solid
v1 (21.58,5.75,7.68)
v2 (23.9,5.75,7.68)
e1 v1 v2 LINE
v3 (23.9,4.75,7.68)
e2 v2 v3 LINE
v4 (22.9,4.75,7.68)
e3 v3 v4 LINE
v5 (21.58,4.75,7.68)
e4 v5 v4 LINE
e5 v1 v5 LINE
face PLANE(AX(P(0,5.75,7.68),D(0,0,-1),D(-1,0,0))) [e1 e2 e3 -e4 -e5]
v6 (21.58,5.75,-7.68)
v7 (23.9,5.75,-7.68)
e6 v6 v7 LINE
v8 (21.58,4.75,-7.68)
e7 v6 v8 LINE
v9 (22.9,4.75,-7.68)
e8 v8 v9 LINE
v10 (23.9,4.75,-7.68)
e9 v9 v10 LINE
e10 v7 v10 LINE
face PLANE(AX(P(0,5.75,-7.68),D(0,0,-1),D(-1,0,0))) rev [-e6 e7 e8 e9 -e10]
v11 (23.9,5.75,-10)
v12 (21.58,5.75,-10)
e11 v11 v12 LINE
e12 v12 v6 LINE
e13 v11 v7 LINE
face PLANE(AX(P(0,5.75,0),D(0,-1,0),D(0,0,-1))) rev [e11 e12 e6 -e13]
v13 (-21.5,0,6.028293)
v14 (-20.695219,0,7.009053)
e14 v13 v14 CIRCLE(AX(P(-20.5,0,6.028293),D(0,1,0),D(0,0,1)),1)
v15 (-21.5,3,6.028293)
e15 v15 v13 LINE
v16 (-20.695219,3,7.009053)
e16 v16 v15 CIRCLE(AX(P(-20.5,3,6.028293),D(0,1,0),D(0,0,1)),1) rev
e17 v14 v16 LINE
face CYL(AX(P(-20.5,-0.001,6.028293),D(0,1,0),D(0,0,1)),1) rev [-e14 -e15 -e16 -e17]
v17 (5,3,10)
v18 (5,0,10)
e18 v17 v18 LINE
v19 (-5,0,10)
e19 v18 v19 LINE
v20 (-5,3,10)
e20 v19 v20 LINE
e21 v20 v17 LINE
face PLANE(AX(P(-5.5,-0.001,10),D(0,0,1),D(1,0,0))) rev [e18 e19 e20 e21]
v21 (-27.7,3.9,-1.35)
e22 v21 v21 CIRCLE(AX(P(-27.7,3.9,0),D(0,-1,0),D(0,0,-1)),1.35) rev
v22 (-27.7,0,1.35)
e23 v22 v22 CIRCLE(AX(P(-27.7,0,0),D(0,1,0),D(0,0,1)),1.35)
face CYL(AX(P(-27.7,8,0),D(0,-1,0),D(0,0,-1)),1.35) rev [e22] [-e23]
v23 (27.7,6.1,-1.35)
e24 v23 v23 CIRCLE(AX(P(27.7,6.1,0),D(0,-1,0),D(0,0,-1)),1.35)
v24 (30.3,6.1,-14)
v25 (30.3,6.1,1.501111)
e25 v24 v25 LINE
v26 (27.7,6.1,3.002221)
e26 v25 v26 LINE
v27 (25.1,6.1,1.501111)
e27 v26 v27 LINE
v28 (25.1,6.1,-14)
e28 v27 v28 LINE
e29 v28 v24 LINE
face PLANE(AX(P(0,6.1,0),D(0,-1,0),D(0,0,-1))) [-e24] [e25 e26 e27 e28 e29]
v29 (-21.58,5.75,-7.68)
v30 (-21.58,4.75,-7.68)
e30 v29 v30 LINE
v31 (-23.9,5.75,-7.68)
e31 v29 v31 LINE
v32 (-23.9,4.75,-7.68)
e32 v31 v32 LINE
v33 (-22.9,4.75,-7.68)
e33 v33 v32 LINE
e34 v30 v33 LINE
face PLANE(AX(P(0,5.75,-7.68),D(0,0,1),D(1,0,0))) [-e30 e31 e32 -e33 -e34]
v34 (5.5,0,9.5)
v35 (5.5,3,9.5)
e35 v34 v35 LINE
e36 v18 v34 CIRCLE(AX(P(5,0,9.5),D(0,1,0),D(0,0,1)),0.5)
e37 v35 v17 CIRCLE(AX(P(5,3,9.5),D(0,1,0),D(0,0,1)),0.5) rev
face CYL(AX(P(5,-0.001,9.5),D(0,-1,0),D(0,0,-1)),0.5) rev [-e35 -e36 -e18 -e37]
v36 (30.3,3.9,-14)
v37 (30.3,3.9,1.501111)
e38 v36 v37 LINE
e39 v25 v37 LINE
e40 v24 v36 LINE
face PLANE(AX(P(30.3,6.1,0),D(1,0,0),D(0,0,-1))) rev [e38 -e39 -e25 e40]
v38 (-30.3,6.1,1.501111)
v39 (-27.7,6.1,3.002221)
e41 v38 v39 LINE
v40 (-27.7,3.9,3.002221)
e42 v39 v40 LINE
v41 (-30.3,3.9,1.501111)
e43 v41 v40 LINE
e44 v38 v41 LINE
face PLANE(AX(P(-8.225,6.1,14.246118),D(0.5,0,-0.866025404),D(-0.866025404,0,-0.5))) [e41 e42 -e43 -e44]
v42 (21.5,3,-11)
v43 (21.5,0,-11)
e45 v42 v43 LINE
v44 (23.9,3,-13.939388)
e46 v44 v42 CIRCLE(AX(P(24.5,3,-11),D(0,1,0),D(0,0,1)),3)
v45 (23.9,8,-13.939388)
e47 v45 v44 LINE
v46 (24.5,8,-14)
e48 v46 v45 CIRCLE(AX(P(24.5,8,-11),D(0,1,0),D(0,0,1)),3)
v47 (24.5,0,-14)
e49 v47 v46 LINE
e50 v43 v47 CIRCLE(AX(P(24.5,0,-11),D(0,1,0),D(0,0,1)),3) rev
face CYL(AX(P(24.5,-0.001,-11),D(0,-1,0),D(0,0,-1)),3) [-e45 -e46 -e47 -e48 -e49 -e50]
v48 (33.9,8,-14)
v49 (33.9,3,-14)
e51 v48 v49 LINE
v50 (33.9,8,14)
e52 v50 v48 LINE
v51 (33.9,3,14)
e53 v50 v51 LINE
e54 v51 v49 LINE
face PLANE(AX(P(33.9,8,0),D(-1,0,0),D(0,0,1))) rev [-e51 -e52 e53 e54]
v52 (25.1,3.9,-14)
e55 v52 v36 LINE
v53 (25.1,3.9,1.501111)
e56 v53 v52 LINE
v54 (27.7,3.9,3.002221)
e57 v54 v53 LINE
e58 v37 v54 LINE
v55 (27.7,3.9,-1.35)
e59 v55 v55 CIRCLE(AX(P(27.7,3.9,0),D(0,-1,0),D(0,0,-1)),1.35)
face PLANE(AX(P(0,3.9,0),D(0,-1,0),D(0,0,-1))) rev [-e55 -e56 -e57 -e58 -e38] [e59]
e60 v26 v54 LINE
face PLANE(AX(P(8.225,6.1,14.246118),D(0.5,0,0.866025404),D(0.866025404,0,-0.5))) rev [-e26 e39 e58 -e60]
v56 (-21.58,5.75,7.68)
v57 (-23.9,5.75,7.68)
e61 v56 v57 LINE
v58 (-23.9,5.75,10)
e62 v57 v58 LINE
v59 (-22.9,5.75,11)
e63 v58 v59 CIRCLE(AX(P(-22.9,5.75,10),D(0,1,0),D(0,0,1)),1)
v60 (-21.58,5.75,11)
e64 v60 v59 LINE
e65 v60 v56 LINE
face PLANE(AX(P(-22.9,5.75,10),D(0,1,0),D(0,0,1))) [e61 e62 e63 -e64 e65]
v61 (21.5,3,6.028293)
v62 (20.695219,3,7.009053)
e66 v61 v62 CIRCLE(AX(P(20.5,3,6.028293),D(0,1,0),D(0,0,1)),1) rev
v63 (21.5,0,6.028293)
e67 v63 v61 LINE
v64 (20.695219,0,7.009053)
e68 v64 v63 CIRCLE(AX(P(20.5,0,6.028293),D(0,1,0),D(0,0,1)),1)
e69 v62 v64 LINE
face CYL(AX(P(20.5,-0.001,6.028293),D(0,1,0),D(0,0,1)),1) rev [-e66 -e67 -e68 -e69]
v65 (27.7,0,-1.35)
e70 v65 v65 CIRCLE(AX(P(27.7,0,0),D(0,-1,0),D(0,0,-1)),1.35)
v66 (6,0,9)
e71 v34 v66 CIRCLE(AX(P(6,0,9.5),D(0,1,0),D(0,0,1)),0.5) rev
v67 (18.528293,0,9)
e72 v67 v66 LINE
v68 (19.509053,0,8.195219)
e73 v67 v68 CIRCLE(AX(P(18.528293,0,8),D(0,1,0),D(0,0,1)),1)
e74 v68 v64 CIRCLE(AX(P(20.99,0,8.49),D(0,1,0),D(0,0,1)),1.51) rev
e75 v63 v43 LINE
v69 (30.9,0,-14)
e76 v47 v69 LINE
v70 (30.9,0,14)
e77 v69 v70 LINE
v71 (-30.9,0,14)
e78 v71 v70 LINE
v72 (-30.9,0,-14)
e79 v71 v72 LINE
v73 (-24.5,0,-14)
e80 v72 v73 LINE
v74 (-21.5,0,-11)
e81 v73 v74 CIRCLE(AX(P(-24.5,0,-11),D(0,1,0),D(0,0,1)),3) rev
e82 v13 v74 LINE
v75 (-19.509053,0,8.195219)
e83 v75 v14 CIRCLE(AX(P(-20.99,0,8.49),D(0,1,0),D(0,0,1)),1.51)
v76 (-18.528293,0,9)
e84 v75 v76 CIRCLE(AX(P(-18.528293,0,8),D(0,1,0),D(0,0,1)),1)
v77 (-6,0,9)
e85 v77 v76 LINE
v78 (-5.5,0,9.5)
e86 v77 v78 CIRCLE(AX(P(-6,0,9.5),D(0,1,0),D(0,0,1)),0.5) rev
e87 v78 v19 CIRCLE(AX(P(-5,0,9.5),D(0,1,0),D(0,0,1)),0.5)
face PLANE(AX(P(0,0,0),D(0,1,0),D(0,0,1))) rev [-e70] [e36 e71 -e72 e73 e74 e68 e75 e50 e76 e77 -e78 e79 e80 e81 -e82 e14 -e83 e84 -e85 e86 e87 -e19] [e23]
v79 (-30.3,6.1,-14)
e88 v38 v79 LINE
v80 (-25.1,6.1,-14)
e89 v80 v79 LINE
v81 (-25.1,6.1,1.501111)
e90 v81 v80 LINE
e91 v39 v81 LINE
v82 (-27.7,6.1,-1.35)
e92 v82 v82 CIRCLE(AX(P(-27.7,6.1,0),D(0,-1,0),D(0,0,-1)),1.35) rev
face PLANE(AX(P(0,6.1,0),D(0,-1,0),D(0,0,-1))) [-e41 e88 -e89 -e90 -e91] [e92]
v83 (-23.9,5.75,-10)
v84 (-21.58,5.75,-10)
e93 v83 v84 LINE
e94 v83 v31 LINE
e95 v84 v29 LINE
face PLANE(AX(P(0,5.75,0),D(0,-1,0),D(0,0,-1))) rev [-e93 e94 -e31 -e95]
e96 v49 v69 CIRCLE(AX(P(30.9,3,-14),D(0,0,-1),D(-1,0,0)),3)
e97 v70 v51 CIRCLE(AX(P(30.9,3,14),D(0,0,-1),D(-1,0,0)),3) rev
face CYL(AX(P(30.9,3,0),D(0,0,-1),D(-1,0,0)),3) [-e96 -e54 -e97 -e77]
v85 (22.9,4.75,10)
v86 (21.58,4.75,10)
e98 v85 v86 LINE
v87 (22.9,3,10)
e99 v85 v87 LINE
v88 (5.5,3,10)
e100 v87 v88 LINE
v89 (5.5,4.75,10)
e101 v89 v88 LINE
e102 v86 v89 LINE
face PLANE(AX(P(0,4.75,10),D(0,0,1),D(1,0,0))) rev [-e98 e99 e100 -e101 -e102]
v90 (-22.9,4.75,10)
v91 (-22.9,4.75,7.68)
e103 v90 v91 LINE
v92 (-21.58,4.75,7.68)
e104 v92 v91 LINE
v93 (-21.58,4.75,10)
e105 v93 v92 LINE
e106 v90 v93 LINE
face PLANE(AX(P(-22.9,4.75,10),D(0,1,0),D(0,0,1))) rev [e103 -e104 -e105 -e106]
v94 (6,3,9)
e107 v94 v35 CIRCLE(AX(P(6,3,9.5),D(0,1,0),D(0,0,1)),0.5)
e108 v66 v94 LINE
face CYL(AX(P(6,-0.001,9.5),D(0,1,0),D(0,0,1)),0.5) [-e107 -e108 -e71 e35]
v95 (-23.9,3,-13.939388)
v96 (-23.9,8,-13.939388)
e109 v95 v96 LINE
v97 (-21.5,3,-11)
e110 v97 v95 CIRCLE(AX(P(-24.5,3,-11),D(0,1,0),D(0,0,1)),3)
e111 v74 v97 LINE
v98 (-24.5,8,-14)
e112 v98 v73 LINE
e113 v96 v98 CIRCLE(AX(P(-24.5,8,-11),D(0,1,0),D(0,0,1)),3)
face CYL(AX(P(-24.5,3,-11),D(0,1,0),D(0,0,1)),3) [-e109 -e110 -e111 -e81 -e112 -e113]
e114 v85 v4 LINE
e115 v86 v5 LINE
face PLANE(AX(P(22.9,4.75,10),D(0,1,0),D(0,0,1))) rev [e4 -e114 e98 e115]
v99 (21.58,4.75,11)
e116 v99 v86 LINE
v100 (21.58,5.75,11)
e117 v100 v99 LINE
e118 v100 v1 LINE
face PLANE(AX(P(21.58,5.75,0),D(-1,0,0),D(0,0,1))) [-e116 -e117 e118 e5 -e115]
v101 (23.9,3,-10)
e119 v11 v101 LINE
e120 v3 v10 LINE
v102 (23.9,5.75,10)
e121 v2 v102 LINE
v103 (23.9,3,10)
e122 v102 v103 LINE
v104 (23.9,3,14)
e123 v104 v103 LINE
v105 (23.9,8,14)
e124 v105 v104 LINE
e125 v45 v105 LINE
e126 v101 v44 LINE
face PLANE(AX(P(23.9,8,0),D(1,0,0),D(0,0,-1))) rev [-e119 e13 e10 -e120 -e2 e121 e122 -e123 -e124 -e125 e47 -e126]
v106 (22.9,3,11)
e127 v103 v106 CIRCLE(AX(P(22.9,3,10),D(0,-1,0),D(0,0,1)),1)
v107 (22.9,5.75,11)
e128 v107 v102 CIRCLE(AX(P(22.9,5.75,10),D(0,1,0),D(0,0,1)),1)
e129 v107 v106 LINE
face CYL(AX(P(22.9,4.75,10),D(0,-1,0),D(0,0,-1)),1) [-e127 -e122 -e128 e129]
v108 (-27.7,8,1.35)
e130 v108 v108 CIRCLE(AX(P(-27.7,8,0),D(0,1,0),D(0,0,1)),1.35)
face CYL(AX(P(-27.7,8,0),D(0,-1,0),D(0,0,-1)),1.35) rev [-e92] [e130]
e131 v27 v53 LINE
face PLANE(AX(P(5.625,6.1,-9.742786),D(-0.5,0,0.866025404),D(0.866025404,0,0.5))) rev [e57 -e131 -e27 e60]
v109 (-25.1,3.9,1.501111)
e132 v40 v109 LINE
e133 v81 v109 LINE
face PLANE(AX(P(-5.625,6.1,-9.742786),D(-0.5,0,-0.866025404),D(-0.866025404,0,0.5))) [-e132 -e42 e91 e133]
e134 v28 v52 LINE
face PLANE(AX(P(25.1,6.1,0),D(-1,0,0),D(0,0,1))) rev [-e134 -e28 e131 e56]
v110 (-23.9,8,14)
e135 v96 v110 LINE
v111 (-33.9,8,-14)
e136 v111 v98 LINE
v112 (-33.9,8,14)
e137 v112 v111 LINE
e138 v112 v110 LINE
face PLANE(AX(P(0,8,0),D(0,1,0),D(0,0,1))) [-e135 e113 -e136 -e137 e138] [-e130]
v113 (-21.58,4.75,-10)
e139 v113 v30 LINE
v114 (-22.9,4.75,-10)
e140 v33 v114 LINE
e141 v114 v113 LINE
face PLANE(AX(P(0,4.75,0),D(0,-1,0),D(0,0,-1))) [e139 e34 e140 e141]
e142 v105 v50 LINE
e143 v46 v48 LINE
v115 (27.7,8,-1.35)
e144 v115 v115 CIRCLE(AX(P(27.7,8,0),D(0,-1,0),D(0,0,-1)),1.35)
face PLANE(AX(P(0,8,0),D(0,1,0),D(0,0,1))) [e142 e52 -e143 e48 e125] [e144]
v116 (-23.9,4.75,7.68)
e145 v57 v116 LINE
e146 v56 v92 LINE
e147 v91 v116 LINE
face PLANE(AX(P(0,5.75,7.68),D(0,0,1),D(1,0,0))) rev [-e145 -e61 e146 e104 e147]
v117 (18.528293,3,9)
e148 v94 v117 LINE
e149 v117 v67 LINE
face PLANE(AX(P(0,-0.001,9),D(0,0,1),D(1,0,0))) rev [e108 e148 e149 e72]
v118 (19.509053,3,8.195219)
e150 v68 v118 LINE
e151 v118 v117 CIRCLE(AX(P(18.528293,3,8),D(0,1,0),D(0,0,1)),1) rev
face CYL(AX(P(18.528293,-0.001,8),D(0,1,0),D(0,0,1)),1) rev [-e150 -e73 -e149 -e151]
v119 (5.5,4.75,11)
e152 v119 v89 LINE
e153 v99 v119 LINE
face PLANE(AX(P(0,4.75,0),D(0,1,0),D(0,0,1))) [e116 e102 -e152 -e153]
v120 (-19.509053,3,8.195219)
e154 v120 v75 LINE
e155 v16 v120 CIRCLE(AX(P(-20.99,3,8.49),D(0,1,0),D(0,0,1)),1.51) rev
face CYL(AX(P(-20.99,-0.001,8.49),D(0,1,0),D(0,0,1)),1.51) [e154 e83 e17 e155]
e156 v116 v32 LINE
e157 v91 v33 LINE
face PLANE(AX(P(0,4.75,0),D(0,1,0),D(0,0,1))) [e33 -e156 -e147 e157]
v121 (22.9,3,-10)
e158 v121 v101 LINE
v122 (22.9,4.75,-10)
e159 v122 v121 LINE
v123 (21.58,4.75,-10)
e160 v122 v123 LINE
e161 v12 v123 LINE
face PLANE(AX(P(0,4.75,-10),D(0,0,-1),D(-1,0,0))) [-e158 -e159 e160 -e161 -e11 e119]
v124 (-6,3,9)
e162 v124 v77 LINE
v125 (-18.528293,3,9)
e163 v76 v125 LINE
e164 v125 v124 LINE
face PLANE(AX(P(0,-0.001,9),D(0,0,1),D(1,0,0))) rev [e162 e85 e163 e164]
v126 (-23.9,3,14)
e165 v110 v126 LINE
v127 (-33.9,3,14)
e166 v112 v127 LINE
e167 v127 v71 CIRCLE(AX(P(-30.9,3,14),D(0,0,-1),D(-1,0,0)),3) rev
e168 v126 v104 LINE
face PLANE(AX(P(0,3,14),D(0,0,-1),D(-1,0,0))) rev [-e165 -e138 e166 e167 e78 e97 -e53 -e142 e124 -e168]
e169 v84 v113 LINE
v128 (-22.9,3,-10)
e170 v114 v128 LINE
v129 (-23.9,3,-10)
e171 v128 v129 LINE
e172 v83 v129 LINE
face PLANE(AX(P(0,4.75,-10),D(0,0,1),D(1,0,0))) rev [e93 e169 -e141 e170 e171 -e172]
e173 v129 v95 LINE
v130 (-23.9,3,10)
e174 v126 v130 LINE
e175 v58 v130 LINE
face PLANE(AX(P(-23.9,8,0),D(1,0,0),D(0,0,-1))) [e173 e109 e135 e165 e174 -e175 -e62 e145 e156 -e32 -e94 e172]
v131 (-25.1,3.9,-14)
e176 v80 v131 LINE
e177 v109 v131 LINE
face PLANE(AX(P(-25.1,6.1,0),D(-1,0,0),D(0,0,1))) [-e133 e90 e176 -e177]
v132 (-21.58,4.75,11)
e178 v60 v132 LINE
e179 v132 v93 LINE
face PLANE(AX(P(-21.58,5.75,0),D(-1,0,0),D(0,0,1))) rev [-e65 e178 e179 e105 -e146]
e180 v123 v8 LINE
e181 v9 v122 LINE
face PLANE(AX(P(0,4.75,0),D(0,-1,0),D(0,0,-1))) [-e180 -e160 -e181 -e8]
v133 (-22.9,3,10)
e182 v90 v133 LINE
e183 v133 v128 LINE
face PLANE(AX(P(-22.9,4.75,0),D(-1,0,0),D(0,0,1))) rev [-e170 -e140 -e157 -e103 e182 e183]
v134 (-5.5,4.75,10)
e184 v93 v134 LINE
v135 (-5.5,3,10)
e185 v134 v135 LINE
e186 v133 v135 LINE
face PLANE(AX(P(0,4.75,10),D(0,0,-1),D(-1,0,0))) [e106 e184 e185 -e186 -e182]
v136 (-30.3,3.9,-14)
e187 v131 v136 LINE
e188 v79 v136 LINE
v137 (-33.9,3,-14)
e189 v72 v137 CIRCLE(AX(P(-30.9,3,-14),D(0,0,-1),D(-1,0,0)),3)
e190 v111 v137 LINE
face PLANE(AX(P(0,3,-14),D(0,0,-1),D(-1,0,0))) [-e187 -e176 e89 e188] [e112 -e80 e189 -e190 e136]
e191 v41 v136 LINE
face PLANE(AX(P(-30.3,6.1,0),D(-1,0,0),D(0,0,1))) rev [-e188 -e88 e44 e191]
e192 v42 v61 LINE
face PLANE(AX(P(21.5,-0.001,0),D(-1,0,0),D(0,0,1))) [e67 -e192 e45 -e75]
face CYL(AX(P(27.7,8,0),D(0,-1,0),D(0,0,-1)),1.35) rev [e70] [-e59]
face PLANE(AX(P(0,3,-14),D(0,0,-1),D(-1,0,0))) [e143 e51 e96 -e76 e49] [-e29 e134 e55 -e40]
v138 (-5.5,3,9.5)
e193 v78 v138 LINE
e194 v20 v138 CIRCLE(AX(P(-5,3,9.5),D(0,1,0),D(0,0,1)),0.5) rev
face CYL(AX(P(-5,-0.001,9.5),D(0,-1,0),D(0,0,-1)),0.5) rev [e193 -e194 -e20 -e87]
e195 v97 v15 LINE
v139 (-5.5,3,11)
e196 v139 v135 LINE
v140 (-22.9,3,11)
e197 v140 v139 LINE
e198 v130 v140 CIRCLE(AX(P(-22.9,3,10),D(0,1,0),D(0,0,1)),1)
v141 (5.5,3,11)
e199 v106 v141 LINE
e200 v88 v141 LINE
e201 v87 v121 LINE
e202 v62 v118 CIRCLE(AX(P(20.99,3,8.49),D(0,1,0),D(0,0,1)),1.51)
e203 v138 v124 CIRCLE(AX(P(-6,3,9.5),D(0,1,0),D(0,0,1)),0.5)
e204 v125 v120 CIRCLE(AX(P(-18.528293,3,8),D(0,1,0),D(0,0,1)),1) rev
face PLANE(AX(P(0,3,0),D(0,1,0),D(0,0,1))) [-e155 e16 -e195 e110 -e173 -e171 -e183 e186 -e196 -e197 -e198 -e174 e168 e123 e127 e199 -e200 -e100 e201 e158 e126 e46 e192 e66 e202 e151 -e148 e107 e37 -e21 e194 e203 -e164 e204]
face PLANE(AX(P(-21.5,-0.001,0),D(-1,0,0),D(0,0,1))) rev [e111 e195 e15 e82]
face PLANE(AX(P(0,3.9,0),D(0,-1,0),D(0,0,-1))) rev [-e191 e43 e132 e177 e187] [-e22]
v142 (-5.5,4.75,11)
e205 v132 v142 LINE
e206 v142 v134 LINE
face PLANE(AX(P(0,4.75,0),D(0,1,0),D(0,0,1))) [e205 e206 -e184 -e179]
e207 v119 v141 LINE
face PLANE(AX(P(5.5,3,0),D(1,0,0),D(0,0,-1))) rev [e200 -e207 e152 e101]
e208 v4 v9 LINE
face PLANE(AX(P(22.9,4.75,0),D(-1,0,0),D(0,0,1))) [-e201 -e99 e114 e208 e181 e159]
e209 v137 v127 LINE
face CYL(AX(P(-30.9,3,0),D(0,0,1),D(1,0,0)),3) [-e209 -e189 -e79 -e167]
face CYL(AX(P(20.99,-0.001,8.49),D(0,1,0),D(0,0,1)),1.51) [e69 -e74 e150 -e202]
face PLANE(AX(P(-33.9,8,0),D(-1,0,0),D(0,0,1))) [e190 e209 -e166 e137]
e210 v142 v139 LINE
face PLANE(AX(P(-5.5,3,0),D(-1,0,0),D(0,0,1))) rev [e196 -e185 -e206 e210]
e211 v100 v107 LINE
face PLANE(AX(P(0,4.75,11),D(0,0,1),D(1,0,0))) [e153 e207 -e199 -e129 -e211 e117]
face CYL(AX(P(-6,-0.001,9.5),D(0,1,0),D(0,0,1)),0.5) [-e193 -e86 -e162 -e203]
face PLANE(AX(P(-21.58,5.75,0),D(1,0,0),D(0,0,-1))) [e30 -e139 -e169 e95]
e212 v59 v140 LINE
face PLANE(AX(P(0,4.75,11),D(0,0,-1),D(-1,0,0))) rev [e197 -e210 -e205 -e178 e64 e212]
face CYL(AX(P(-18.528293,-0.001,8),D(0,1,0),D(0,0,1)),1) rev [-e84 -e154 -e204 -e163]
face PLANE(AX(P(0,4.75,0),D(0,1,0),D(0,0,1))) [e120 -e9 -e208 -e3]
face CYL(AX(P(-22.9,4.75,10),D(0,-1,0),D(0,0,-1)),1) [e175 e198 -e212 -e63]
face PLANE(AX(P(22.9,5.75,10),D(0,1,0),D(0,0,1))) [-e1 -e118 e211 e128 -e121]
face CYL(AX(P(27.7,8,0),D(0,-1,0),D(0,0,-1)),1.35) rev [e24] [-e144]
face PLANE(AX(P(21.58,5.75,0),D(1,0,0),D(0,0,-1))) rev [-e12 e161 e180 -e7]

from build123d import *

# Parameters (mm, degrees)
SKETCH1_R                = 8.05
SKETCH1_R_2              = 0.8
BOSS_EXTRUDE1_DEPTH      = 3
SKETCH1_5_R              = 0.8
BOSS_EXTRUDE3_DEPTH      = 3
CUT_EXTRUDE2_REACH       = 32.121
SKETCH5_R                = 8.05
FILLET2_R                = 1
BOSS_EXTRUDE4_DEPTH      = 1.75
BOSS_EXTRUDE7_START      = 1.75
SKETCH6_5_W              = 2.32
SKETCH6_5_H              = 2.32
BOSS_EXTRUDE7_DEPTH      = 1
SKETCH7_W                = 10
SKETCH7_H                = 28
BOSS_EXTRUDE8_DEPTH      = 8
SKETCH8_R                = 1.35
CUT_EXTRUDE3_DEPTH       = 1.1
CUT_EXTRUDE4_DEPTH       = 38.01634774
CUT_EXTRUDE4_DEPTH_BACK  = 38.01634774
SKETCH8_3_R              = 1.35
BOSS_EXTRUDE9_DEPTH      = 20
BOSS_EXTRUDE9_DEPTH_BACK = 20
SKETCH10_W               = 5
SKETCH10_H               = 3
CUT_EXTRUDE5_REACH       = 39.539
SKETCH9_W                = 43
SKETCH9_H                = 7.971706725
CUT_EXTRUDE6_REACH       = 39.016
SKETCH12_W               = 11
SKETCH12_H               = 1
FILLET3_R                = 3
FILLET4_START            = -1
FILLET4_DEPTH            = 5
FILLET4_2_DEPTH          = 3


with BuildPart() as part:
    # Sketch1 → Boss-Extrude1 (new body)
    with BuildSketch(Plane(origin=(0, 0, 0), x_dir=(1, 0, 0), z_dir=(0, 1, 0))):
        with BuildLine():
            Line((5.5, -7), (5.5, -14))
            Line((5.5, -14), (25.5, -14))
            ThreePointArc((25.5, -14), (26.207106781, -13.707106781), (26.5, -13))
            Line((26.5, -13), (26.5, 13))
            ThreePointArc((26.5, 13), (26.207106781, 13.707106781), (25.5, 14))
            Line((25.5, 14), (-25.5, 14))
            ThreePointArc((-25.5, 14), (-26.207106781, 13.707106781), (-26.5, 13))
            Line((-26.5, 13), (-26.5, -13))
            ThreePointArc((-26.5, -13), (-26.207106781, -13.707106781), (-25.5, -14))
            Line((-25.5, -14), (-5.5, -14))
            Line((-5.5, -14), (-5.5, -7))
            Line((-5.5, -7), (5.5, -7))
        make_face()
        with Locations(Location((-12.95, 0, 0), (0, 0, 270))):
            Circle(SKETCH1_R, mode=Mode.SUBTRACT)
        with Locations(Location((12.95, 0, 0), (0, 0, 270))):
            Circle(SKETCH1_R, mode=Mode.SUBTRACT)
        with BuildLine():
            ThreePointArc((-3.25, 5.75), (-5.25, 7.75), (-3.25, 9.75))
            Line((-3.25, 9.75), (3.25, 9.75))
            ThreePointArc((3.25, 9.75), (5.25, 7.75), (3.25, 5.75))
            Line((3.25, 5.75), (-3.25, 5.75))
        make_face(mode=Mode.SUBTRACT)
        with Locations(Location((-20.99, 8.49, 0), (0, 0, 270))):
            Circle(SKETCH1_R_2, mode=Mode.SUBTRACT)
        with Locations(Location((20.99, 8.49, 0), (0, 0, 270))):
            Circle(SKETCH1_R_2, mode=Mode.SUBTRACT)
        with Locations(Location((20.99, -8.49, 0), (0, 0, 270))):
            Circle(SKETCH1_R_2, mode=Mode.SUBTRACT)
        with Locations(Location((-20.99, -8.49, 0), (0, 0, 270))):
            Circle(SKETCH1_R_2, mode=Mode.SUBTRACT)
    extrude(amount=BOSS_EXTRUDE1_DEPTH)

    # Sketch1<5> → Boss-Extrude3 (add)
    with BuildSketch(Plane(origin=(0, 0, 0), x_dir=(1, 0, 0), z_dir=(0, 1, 0))):
        with Locations((20.99, 8.49)):
            Circle(SKETCH1_5_R)
        with Locations((-20.99, 8.49)):
            Circle(SKETCH1_5_R)
        with Locations((-20.99, -8.49)):
            Circle(SKETCH1_5_R)
        with Locations((20.99, -8.49)):
            Circle(SKETCH1_5_R)
    extrude(amount=BOSS_EXTRUDE3_DEPTH)

    # Sketch5 → Cut-Extrude2 (cut, up to next)
    with BuildSketch(Plane(origin=(0, 3, 0), x_dir=(1, 0, 0), z_dir=(0, 1, 0)), mode=Mode.PRIVATE) as cut_extrude2_sk1:
        with BuildLine():
            Line((3.25, 5.75), (-3.25, 5.75))
            ThreePointArc((-3.25, 5.75), (-5.052775638, 6.883974596), (-4.8112495, 9))
            Line((-4.8112495, 9), (-19.56873296, 9))
            ThreePointArc((-19.56873296, 9), (-19.502348624, 8.748830803), (-19.48, 8.49))
            ThreePointArc((-19.48, 8.49), (-20.12109264, 7.255050608), (-21.5, 7.06873296))
            Line((-21.5, 7.06873296), (-21.5, -7.06873296))
            ThreePointArc((-21.5, -7.06873296), (-20.12109264, -7.255050608), (-19.48, -8.49))
            ThreePointArc((-19.48, -8.49), (-19.502348624, -8.748830803), (-19.56873296, -9))
            Line((-19.56873296, -9), (-5.5, -9))
            Line((-5.5, -9), (-5.5, -7))
            Line((-5.5, -7), (5.5, -7))
            Line((5.5, -7), (5.5, -9))
            Line((5.5, -9), (19.56873296, -9))
            ThreePointArc((19.56873296, -9), (19.92226876, -7.42226876), (21.5, -7.06873296))
            Line((21.5, -7.06873296), (21.5, 7.06873296))
            ThreePointArc((21.5, 7.06873296), (19.92226876, 7.42226876), (19.56873296, 9))
            Line((19.56873296, 9), (4.8112495, 9))
            ThreePointArc((4.8112495, 9), (5.052775638, 6.883974596), (3.25, 5.75))
        make_face()
        with Locations((-12.95, 0)):
            Circle(SKETCH5_R, mode=Mode.SUBTRACT)
        with Locations((12.95, 0)):
            Circle(SKETCH5_R, mode=Mode.SUBTRACT)
    cut_extrude2_tool1 = extrude(cut_extrude2_sk1.sketch, amount=-CUT_EXTRUDE2_REACH, mode=Mode.PRIVATE) & part.part
    add(cut_extrude2_tool1.solids().sort_by_distance((0, 3, 0.207713))[0], mode=Mode.SUBTRACT)

    # Fillet2
    fillet2_edges = [part.edges().sort_by_distance(p)[0] for p in [
        (21.5, 1.5, 7.06873296),
        (19.56873296, 1.5, 9),
        (5.5, 1.5, 9),
        (-5.5, 1.5, 9),
        (-19.56873296, 1.5, 9),
        (-21.5, 1.5, 7.06873296),
        (-21.5, 1.5, -7.06873296),
        (-19.56873296, 1.5, -9),
        (-4.8112495, 1.5, -9),
        (4.8112495, 1.5, -9),
        (19.56873296, 1.5, -9),
        (21.5, 1.5, -7.06873296),
    ]]
    fillet(fillet2_edges, radius=FILLET2_R)

    # Sketch6 → Boss-Extrude4 (add)
    with BuildSketch(Plane(origin=(0, 3, 0), x_dir=(1, 0, 0), z_dir=(0, 1, 0))):
        with BuildLine():
            ThreePointArc((-23.9, -10), (-23.607106781, -10.707106781), (-22.9, -11))
            Line((-22.9, -11), (-5.5, -11))
            Line((-5.5, -11), (-5.5, -10))
            Line((-5.5, -10), (-22.9, -10))
            Line((-22.9, -10), (-22.9, 10))
            Line((-22.9, 10), (-23.9, 10))
            Line((-23.9, 10), (-23.9, -10))
        make_face()
    boss_extrude4 = extrude(amount=BOSS_EXTRUDE4_DEPTH)

    # Sketch6<5> → Boss-Extrude7 (add)
    with BuildSketch(Plane(origin=(0, 3, 0), x_dir=(1, 0, 0), z_dir=(0, 1, 0)).offset(BOSS_EXTRUDE7_START)):
        with BuildLine():
            Line((-23.9, -7.68), (-23.9, -10))
            ThreePointArc((-23.9, -10), (-23.607106781, -10.707106781), (-22.9, -11))
            Line((-22.9, -11), (-21.58, -11))
            Line((-21.58, -11), (-21.58, -7.68))
            Line((-21.58, -7.68), (-23.9, -7.68))
        make_face()
        with Locations((-22.74, 8.84)):
            Rectangle(SKETCH6_5_W, SKETCH6_5_H)
    boss_extrude7 = extrude(amount=BOSS_EXTRUDE7_DEPTH)

    # Mirror1: Boss-Extrude4, Boss-Extrude7 across plane
    add(boss_extrude4.mirror(Plane(origin=(0, 0, 0), x_dir=(0, 0, 1), z_dir=(1, 0, 0))))
    add(boss_extrude7.mirror(Plane(origin=(0, 0, 0), x_dir=(0, 0, 1), z_dir=(1, 0, 0))))

    # Sketch7 → Boss-Extrude8 (add)
    with BuildSketch(Plane(origin=(0, 0, 0), x_dir=(1, 0, 0), z_dir=(0, 1, 0))):
        with Locations((-28.9, 0)):
            Rectangle(SKETCH7_W, SKETCH7_H)
        with Locations((28.9, 0)):
            Rectangle(SKETCH7_W, SKETCH7_H)
    extrude(amount=BOSS_EXTRUDE8_DEPTH)

    # Sketch8 → Cut-Extrude3 (cut, symmetric)
    with BuildSketch(Plane(origin=(0, 5, 0), x_dir=(-1, 0, 0), z_dir=(0, -1, 0))):
        Polygon((-30.3, 1.5011107), (-30.3, -1.5011107), (-27.7, -3.0022214), (-25.1, -1.5011107), (-25.1, 1.5011107), (-27.7, 3.0022214), align=None)
        Polygon((-25.1, 1.5011107), (-25.1, 14), (-30.3, 14), (-30.3, 1.5011107), (-27.7, 3.0022214), align=None)
        Polygon((25.1, 14), (30.3, 14), (30.3, 1.5011107), (27.7, 3.0022214), (25.1, 1.5011107), align=None)
        Polygon((30.3, -1.5011107), (27.7, -3.0022214), (25.1, -1.5011107), (25.1, 1.5011107), (27.7, 3.0022214), (30.3, 1.5011107), align=None)
        with Locations((27.7, 0)):
            Circle(SKETCH8_R)
        with Locations((-27.7, 0)):
            Circle(SKETCH8_R)
    extrude(amount=CUT_EXTRUDE3_DEPTH, both=True, mode=Mode.SUBTRACT)

    # Sketch8<3> → Cut-Extrude4 (cut, two sides: drawn at the far end of the back side and taken through both)
    with BuildSketch(Plane(origin=(0, 5, 0), x_dir=(-1, 0, 0), z_dir=(0, -1, 0)).offset(-CUT_EXTRUDE4_DEPTH_BACK)):
        with Locations(Location((-27.7, 0, 0), (0, 0, 90))):
            Circle(SKETCH8_3_R)
        with Locations(Location((27.7, 0, 0), (0, 0, 90))):
            Circle(SKETCH8_3_R)
    extrude(amount=CUT_EXTRUDE4_DEPTH + CUT_EXTRUDE4_DEPTH_BACK, mode=Mode.SUBTRACT)

    # Sketch10 → Boss-Extrude9 (add, two sides: drawn at the far end of the back side and taken through both)
    with BuildSketch(Plane(origin=(-5.5, 0, 0), x_dir=(0, 0, -1), z_dir=(1, 0, 0)).offset(-BOSS_EXTRUDE9_DEPTH_BACK)):
        with Locations((-11.5, 1.5)):
            Rectangle(SKETCH10_W, SKETCH10_H)
    extrude(amount=BOSS_EXTRUDE9_DEPTH + BOSS_EXTRUDE9_DEPTH_BACK)

    # Sketch9 → Cut-Extrude5 (cut, up to next)
    with BuildSketch(Plane.XZ, mode=Mode.PRIVATE) as cut_extrude5_sk1:
        with Locations((0, -10.014146637)):
            Rectangle(SKETCH9_W, SKETCH9_H)
    cut_extrude5_tool1 = extrude(cut_extrude5_sk1.sketch, amount=-CUT_EXTRUDE5_REACH, mode=Mode.PRIVATE) & part.part
    add(cut_extrude5_tool1.solids().sort_by_distance((0, 0, -10.014147))[0], mode=Mode.SUBTRACT)

    # Sketch12 → Cut-Extrude6 (cut, up to next)
    with BuildSketch(Plane(origin=(0, 3, 0), x_dir=(1, 0, 0), z_dir=(0, 1, 0)), mode=Mode.PRIVATE) as cut_extrude6_sk1:
        with Locations((0, -9.5)):
            Rectangle(SKETCH12_W, SKETCH12_H)
    cut_extrude6_tool1 = extrude(cut_extrude6_sk1.sketch, amount=-CUT_EXTRUDE6_REACH, mode=Mode.PRIVATE) & part.part
    add(cut_extrude6_tool1.solids().sort_by_distance((0, 3, 9.5))[0], mode=Mode.SUBTRACT)

    # Fillet3
    fillet3_edges = [part.edges().sort_by_distance(p)[0] for p in [
        (33.9, 0, 0),
        (-33.9, 0, 0),
        (21.5, 1.5, -14),
        (-21.5, 1.5, -14),
    ]]
    fillet(fillet3_edges, radius=FILLET3_R)

    # Fillet4: read off the stored shape, not the designer's step
    # Fillet4 outline → Fillet4 (cut)
    with BuildSketch(Plane(origin=(0, 0, 0), x_dir=(1, 0, 0), z_dir=(0, 1, 0)).offset(FILLET4_START)):
        with BuildLine():
            Line((5.5, -9), (5.5, -9.5))
            ThreePointArc((5.5, -9.5), (5.646446609, -9.146446609), (6, -9))
            Line((6, -9), (5.5, -9))
        make_face()
        with BuildLine():
            ThreePointArc((-6, -9), (-5.646446609, -9.146446609), (-5.5, -9.5))
            Line((-5.5, -9.5), (-5.5, -9))
            Line((-5.5, -9), (-6, -9))
        make_face()
    extrude(amount=FILLET4_DEPTH, mode=Mode.SUBTRACT)

    # Fillet4 2 outline → Fillet4 2 (add)
    with BuildSketch(Plane(origin=(0, 0, 0), x_dir=(1, 0, 0), z_dir=(0, 1, 0))):
        with BuildLine():
            ThreePointArc((5.5, -9.5), (5.353553391, -9.853553391), (5, -10))
            Line((5, -10), (5.5, -10))
            Line((5.5, -10), (5.5, -9.5))
        make_face()
        with BuildLine():
            ThreePointArc((-5, -10), (-5.353553391, -9.853553391), (-5.5, -9.5))
            Line((-5.5, -9.5), (-5.5, -10))
            Line((-5.5, -10), (-5, -10))
        make_face()
    extrude(amount=FILLET4_2_DEPTH)


solid = part.part
